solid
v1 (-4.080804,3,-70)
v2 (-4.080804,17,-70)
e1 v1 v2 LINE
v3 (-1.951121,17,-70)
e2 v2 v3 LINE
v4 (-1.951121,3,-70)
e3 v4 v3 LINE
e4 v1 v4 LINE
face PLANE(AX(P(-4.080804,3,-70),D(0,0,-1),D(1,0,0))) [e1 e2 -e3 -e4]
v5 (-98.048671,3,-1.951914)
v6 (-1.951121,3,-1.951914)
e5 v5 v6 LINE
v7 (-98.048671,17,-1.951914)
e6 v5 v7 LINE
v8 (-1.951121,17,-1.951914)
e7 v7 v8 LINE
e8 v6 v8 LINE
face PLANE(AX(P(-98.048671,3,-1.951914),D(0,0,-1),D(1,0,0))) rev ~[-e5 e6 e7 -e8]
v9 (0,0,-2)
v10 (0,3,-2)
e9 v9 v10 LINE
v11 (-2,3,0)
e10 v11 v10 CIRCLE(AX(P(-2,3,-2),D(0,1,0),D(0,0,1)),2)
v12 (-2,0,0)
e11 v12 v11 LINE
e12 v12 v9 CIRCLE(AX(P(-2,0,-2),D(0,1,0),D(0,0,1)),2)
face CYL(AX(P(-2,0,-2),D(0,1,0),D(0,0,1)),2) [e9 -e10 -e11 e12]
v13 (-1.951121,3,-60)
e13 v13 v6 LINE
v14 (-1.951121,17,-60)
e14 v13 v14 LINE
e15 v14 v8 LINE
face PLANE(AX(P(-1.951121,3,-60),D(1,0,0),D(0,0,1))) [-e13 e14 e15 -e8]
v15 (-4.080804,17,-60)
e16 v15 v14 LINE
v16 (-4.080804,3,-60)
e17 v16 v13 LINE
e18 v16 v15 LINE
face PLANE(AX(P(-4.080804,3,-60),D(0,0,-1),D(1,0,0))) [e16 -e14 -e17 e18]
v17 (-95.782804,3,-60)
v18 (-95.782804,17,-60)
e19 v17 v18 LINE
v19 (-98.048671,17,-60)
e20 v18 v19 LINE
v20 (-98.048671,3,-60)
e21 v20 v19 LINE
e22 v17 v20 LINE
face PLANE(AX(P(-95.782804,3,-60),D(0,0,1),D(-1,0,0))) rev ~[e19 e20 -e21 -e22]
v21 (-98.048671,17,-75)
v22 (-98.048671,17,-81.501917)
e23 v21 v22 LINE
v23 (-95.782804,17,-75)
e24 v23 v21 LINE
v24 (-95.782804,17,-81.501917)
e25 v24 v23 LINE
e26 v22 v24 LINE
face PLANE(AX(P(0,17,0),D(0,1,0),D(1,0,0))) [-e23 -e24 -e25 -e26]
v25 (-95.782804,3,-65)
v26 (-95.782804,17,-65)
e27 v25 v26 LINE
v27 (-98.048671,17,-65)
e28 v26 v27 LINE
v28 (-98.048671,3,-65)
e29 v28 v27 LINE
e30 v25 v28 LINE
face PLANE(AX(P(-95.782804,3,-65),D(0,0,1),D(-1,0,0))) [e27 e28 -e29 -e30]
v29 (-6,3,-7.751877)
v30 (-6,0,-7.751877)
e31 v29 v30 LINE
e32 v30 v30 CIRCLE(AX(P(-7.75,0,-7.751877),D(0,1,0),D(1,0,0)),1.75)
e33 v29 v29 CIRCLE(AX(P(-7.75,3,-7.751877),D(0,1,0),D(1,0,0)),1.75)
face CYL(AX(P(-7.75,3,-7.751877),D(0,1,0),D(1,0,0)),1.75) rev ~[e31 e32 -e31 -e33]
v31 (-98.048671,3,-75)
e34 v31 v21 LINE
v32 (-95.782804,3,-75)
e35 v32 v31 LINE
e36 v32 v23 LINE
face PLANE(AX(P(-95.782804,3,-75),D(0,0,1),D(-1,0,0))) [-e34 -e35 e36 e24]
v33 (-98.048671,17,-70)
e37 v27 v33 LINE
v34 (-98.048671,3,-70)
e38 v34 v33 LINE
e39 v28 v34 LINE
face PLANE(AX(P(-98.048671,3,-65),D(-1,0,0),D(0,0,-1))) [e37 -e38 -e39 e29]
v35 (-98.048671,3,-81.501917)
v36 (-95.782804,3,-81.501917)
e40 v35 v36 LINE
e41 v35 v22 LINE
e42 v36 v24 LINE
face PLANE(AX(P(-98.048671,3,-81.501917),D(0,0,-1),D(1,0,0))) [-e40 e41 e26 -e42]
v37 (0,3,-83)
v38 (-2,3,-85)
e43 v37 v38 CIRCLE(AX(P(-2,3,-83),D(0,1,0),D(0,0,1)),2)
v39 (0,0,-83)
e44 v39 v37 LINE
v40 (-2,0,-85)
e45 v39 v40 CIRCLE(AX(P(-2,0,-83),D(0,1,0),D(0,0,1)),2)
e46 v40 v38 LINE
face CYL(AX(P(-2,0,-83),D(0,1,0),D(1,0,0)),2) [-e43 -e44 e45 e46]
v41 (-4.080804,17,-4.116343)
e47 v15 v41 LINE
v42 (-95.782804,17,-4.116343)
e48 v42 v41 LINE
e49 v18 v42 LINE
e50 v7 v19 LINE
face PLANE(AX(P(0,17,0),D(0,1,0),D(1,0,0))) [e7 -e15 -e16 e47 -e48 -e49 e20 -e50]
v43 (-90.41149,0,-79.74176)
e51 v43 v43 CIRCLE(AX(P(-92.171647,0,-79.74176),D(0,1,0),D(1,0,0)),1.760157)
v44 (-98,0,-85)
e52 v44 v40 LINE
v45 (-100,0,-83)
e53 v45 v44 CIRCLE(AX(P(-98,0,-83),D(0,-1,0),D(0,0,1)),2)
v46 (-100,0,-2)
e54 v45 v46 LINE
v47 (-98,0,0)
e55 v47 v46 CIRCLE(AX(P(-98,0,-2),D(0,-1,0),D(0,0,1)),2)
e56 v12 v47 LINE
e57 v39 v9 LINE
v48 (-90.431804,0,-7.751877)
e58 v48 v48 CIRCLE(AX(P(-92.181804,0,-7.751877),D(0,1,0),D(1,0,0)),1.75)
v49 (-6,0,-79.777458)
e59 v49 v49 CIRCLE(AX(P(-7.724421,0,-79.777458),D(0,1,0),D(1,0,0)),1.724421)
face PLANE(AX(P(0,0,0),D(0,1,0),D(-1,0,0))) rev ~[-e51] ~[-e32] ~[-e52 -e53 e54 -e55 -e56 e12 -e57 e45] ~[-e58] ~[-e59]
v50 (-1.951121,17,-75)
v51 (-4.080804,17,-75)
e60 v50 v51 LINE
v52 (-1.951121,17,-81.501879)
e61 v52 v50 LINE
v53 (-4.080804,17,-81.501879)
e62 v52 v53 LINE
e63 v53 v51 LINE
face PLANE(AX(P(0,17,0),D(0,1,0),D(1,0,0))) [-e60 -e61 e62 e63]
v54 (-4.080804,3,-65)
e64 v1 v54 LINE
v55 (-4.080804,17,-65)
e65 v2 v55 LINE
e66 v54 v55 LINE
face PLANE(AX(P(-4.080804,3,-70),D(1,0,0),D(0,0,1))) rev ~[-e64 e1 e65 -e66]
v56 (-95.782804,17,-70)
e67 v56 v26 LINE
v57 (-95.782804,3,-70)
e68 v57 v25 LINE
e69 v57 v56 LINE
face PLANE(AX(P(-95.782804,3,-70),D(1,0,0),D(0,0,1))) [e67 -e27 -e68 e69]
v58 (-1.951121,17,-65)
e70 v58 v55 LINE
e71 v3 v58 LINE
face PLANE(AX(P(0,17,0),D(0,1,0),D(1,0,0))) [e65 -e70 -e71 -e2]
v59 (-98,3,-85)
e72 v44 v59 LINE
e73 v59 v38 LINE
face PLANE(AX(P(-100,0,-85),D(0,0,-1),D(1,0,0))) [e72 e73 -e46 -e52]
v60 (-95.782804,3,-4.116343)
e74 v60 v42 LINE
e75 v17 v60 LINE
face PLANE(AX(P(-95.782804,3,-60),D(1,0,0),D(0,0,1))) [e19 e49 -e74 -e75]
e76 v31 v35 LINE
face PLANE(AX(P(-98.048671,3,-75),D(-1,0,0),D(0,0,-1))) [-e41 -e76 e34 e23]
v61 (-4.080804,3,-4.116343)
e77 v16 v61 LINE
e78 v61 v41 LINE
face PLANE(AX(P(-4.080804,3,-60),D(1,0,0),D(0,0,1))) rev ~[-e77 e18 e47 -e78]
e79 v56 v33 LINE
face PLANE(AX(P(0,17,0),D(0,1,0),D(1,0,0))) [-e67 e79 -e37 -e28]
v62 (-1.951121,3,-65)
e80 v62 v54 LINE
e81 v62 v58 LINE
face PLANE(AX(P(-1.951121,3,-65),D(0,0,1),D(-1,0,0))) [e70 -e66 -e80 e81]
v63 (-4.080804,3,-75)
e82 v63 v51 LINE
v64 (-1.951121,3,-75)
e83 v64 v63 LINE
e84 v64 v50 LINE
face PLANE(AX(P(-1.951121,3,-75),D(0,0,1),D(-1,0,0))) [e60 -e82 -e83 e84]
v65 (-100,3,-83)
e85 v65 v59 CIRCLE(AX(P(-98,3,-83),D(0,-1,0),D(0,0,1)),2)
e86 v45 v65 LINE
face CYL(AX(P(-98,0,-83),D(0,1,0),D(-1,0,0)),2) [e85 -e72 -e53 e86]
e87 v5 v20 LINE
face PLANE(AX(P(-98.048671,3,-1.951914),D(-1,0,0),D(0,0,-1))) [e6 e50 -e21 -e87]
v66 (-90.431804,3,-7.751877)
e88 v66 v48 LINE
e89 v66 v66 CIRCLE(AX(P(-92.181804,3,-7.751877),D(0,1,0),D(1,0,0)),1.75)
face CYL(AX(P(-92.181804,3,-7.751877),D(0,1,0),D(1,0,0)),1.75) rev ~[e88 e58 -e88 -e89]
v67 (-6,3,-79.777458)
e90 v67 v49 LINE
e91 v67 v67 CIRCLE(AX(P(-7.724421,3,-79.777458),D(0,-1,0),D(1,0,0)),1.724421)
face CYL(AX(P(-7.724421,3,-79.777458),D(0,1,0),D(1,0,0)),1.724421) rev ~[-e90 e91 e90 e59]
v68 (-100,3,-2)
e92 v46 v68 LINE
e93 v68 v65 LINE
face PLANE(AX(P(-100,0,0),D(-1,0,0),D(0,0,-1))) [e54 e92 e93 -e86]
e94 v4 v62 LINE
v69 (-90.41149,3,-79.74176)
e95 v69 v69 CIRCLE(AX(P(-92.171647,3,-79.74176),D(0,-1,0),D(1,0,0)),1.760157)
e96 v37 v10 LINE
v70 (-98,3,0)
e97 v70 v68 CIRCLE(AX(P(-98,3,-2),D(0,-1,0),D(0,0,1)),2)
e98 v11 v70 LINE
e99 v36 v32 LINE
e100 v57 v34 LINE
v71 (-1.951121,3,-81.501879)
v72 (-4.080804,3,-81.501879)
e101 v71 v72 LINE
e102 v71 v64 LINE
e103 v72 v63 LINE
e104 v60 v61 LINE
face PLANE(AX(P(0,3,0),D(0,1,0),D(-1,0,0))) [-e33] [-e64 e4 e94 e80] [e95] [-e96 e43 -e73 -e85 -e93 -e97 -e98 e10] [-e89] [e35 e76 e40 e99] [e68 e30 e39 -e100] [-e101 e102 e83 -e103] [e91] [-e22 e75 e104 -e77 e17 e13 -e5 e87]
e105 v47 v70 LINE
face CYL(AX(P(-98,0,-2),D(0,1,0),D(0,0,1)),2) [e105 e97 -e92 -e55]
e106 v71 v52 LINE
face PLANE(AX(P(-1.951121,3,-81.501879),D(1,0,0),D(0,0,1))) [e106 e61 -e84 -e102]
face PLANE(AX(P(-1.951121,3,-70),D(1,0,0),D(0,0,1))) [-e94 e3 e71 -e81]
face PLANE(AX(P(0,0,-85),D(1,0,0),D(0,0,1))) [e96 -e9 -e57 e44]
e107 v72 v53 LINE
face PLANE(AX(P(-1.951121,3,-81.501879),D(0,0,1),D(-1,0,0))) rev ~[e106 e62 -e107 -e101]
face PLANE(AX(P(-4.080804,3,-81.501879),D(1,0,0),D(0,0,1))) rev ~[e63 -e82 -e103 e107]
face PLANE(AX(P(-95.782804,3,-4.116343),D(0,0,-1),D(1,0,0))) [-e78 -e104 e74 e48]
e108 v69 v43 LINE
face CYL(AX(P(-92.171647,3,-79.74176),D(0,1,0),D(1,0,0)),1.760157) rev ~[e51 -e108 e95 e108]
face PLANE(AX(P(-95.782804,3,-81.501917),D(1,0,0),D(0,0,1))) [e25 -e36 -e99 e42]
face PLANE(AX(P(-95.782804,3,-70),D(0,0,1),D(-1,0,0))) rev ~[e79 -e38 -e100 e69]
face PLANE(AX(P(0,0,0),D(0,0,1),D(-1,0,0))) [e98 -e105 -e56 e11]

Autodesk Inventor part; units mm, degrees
ref_plane "YZ Plane" through (0, 0, 0) normal (1, 0, 0) x (0, 1, 0)
ref_plane "XZ Plane" through (0, 0, 0) normal (0, 1, 0) x (-1, 0, 0)
ref_plane "XY Plane" through (0, 0, 0) normal (0, 0, 1) x (1, 0, 0)
sketch "Sketch1" plane through (0, 0, 0) normal (0, 1, 0) x (-1, 0, 0)
  line L0 (0, 0) -> (100, 0)
  line L1 (100, 0) -> (100, -85)
  line L2 (100, -85) -> (0, -85)
  line L3 (0, -85) -> (0, 0)
  line L4 (100, -85) -> (100, -81.5)
  line L5 (100, -85) -> (0, -85)
  line L6 (0, 0) -> (100, 0)
  dimension "d0" = 100
  dimension "d1" = 85
extrude "Extrusion1" add sketch "Sketch1" along normal blind 3
sketch "Sketch5" plane through (0, 3, 0) normal (0, 1, 0) x (1, 0, 0)
  line L0 (-100, 85.001914) -> (0, 85.001914)
  line L1 (0, 85.001914) -> (0, 0.001914)
  line L2 (0, 0.001914) -> (-100, 0.001914)
  line L3 (0, 0.001914) -> (0, 3.501877)
  line L4 (0, 0.001914) -> (-100, 0.001914)
  line L5 (-100, 85.001914) -> (0, 85.001914)
  line L6 (-100, 85) -> (-100, 0)
  line L7 (-100, 85) -> (-100, 0)
  line L8 (0, 81.501879) -> (-13.977379, 81.501879)
  line L9 (0, 85) -> (-100, 85)
  line L10 (-13.977379, 81.501879) -> (-13.977379, 85)
  line L11 (0, 0) -> (0, 85)
  line L12 (0, 81.501879) -> (0, 85)
  line L13 (0, 85) -> (-13.977379, 85)
  line L14 (0, 81.501879) -> (-6, 81.501879)
  line L15 (-100, 85) -> (-100, 0)
  line L16 (-100, 0) -> (0, 0)
  line L17 (-100, 81.501917) -> (-84.168275, 81.501917)
  line L18 (-84.168275, 85) -> (-84.168275, 81.501917)
  line L19 (-93.931804, 81.467894) -> (-95.682804, 81.467894)
  line L20 (-98.248671, 81.501917) -> (-100, 81.501917)
  line L21 (-47.950989, 85) -> (-11.964435, 85)
  line L22 (-57.205258, 85) -> (-86.408023, 85)
  circle A0 centre (-7.75, 7.751877) radius 1.75
  circle A1 centre (-92.181804, 7.751877) radius 1.75
  circle A2 centre (-7.724421, 79.777458) radius 1.724421
  circle A3 centre (-92.171647, 79.74176) radius 1.760157
  line L23 (-6, 6.035046) -> (-6, 6.001877)
  line L24 (-1.751121, 81.501879) -> (-1.951121, 81.501879)
  line L25 (-1.951121, 81.501879) -> (-1.951121, 1.951914)
  line L26 (-98.048671, 1.951914) -> (-98.048671, 81.501917)
  line L27 (-98.048671, 1.951914) -> (-1.951121, 1.951914)
  line L28 (-4.180804, 81.501879) -> (-4.080804, 81.501879)
  line L29 (-4.080804, 81.501879) -> (-4.080804, 4.116343)
  line L30 (-95.682804, 81.501917) -> (-95.782804, 81.501917)
  line L31 (-95.782804, 81.501917) -> (-95.782804, 4.116343)
  line L32 (-95.782804, 4.116343) -> (-4.080804, 4.116343)
  line L33 (0, 85) -> (0, 75)
  line L34 (-1.951121, 75) -> (-4.080804, 75)
  line L35 (-4.080804, 75) -> (-4.080804, 70)
  line L36 (-4.080804, 70) -> (-1.951121, 70)
  line L37 (-1.951121, 70) -> (-1.951121, 65)
  line L38 (-1.951121, 65) -> (-4.080804, 65)
  line L39 (-4.080804, 65) -> (-4.080804, 60)
  line L40 (-4.080804, 60) -> (-1.951121, 60)
  line L41 (-95.782804, 60) -> (-98.048671, 60)
  line L42 (-95.782804, 65) -> (-98.048671, 65)
  line L43 (-95.782804, 70) -> (-98.048671, 70)
  line L44 (-95.782804, 75) -> (-98.048671, 75)
  point P0 (-92.171647, 81.501917)
  point P1 (-7.724421, 81.501879)
  dimension "d22" = 100
  dimension "d23" = 85
  dimension "d61" = 3.5
  dimension "d74" = 0.1
extrude "Extrusion10" add sketch "Sketch5" along normal blind 14 contours L17 L31 L44 L26 | L43 L31 L42 L26 | L41 L31 L32 L29 L40 L25 L27 L26 | L25 L34 L29 L8 | L25 L38 L29 L36
extrude "Extrusion11" cut sketch "Sketch5" against normal through all contours A3 | A2 | A0 | A1
fillet "Fillet1" radius 2 4 edges at (-100, 1.5, -85) (-100, 1.5, 0) (0, 1.5, -85) (0, 1.5, 0)
